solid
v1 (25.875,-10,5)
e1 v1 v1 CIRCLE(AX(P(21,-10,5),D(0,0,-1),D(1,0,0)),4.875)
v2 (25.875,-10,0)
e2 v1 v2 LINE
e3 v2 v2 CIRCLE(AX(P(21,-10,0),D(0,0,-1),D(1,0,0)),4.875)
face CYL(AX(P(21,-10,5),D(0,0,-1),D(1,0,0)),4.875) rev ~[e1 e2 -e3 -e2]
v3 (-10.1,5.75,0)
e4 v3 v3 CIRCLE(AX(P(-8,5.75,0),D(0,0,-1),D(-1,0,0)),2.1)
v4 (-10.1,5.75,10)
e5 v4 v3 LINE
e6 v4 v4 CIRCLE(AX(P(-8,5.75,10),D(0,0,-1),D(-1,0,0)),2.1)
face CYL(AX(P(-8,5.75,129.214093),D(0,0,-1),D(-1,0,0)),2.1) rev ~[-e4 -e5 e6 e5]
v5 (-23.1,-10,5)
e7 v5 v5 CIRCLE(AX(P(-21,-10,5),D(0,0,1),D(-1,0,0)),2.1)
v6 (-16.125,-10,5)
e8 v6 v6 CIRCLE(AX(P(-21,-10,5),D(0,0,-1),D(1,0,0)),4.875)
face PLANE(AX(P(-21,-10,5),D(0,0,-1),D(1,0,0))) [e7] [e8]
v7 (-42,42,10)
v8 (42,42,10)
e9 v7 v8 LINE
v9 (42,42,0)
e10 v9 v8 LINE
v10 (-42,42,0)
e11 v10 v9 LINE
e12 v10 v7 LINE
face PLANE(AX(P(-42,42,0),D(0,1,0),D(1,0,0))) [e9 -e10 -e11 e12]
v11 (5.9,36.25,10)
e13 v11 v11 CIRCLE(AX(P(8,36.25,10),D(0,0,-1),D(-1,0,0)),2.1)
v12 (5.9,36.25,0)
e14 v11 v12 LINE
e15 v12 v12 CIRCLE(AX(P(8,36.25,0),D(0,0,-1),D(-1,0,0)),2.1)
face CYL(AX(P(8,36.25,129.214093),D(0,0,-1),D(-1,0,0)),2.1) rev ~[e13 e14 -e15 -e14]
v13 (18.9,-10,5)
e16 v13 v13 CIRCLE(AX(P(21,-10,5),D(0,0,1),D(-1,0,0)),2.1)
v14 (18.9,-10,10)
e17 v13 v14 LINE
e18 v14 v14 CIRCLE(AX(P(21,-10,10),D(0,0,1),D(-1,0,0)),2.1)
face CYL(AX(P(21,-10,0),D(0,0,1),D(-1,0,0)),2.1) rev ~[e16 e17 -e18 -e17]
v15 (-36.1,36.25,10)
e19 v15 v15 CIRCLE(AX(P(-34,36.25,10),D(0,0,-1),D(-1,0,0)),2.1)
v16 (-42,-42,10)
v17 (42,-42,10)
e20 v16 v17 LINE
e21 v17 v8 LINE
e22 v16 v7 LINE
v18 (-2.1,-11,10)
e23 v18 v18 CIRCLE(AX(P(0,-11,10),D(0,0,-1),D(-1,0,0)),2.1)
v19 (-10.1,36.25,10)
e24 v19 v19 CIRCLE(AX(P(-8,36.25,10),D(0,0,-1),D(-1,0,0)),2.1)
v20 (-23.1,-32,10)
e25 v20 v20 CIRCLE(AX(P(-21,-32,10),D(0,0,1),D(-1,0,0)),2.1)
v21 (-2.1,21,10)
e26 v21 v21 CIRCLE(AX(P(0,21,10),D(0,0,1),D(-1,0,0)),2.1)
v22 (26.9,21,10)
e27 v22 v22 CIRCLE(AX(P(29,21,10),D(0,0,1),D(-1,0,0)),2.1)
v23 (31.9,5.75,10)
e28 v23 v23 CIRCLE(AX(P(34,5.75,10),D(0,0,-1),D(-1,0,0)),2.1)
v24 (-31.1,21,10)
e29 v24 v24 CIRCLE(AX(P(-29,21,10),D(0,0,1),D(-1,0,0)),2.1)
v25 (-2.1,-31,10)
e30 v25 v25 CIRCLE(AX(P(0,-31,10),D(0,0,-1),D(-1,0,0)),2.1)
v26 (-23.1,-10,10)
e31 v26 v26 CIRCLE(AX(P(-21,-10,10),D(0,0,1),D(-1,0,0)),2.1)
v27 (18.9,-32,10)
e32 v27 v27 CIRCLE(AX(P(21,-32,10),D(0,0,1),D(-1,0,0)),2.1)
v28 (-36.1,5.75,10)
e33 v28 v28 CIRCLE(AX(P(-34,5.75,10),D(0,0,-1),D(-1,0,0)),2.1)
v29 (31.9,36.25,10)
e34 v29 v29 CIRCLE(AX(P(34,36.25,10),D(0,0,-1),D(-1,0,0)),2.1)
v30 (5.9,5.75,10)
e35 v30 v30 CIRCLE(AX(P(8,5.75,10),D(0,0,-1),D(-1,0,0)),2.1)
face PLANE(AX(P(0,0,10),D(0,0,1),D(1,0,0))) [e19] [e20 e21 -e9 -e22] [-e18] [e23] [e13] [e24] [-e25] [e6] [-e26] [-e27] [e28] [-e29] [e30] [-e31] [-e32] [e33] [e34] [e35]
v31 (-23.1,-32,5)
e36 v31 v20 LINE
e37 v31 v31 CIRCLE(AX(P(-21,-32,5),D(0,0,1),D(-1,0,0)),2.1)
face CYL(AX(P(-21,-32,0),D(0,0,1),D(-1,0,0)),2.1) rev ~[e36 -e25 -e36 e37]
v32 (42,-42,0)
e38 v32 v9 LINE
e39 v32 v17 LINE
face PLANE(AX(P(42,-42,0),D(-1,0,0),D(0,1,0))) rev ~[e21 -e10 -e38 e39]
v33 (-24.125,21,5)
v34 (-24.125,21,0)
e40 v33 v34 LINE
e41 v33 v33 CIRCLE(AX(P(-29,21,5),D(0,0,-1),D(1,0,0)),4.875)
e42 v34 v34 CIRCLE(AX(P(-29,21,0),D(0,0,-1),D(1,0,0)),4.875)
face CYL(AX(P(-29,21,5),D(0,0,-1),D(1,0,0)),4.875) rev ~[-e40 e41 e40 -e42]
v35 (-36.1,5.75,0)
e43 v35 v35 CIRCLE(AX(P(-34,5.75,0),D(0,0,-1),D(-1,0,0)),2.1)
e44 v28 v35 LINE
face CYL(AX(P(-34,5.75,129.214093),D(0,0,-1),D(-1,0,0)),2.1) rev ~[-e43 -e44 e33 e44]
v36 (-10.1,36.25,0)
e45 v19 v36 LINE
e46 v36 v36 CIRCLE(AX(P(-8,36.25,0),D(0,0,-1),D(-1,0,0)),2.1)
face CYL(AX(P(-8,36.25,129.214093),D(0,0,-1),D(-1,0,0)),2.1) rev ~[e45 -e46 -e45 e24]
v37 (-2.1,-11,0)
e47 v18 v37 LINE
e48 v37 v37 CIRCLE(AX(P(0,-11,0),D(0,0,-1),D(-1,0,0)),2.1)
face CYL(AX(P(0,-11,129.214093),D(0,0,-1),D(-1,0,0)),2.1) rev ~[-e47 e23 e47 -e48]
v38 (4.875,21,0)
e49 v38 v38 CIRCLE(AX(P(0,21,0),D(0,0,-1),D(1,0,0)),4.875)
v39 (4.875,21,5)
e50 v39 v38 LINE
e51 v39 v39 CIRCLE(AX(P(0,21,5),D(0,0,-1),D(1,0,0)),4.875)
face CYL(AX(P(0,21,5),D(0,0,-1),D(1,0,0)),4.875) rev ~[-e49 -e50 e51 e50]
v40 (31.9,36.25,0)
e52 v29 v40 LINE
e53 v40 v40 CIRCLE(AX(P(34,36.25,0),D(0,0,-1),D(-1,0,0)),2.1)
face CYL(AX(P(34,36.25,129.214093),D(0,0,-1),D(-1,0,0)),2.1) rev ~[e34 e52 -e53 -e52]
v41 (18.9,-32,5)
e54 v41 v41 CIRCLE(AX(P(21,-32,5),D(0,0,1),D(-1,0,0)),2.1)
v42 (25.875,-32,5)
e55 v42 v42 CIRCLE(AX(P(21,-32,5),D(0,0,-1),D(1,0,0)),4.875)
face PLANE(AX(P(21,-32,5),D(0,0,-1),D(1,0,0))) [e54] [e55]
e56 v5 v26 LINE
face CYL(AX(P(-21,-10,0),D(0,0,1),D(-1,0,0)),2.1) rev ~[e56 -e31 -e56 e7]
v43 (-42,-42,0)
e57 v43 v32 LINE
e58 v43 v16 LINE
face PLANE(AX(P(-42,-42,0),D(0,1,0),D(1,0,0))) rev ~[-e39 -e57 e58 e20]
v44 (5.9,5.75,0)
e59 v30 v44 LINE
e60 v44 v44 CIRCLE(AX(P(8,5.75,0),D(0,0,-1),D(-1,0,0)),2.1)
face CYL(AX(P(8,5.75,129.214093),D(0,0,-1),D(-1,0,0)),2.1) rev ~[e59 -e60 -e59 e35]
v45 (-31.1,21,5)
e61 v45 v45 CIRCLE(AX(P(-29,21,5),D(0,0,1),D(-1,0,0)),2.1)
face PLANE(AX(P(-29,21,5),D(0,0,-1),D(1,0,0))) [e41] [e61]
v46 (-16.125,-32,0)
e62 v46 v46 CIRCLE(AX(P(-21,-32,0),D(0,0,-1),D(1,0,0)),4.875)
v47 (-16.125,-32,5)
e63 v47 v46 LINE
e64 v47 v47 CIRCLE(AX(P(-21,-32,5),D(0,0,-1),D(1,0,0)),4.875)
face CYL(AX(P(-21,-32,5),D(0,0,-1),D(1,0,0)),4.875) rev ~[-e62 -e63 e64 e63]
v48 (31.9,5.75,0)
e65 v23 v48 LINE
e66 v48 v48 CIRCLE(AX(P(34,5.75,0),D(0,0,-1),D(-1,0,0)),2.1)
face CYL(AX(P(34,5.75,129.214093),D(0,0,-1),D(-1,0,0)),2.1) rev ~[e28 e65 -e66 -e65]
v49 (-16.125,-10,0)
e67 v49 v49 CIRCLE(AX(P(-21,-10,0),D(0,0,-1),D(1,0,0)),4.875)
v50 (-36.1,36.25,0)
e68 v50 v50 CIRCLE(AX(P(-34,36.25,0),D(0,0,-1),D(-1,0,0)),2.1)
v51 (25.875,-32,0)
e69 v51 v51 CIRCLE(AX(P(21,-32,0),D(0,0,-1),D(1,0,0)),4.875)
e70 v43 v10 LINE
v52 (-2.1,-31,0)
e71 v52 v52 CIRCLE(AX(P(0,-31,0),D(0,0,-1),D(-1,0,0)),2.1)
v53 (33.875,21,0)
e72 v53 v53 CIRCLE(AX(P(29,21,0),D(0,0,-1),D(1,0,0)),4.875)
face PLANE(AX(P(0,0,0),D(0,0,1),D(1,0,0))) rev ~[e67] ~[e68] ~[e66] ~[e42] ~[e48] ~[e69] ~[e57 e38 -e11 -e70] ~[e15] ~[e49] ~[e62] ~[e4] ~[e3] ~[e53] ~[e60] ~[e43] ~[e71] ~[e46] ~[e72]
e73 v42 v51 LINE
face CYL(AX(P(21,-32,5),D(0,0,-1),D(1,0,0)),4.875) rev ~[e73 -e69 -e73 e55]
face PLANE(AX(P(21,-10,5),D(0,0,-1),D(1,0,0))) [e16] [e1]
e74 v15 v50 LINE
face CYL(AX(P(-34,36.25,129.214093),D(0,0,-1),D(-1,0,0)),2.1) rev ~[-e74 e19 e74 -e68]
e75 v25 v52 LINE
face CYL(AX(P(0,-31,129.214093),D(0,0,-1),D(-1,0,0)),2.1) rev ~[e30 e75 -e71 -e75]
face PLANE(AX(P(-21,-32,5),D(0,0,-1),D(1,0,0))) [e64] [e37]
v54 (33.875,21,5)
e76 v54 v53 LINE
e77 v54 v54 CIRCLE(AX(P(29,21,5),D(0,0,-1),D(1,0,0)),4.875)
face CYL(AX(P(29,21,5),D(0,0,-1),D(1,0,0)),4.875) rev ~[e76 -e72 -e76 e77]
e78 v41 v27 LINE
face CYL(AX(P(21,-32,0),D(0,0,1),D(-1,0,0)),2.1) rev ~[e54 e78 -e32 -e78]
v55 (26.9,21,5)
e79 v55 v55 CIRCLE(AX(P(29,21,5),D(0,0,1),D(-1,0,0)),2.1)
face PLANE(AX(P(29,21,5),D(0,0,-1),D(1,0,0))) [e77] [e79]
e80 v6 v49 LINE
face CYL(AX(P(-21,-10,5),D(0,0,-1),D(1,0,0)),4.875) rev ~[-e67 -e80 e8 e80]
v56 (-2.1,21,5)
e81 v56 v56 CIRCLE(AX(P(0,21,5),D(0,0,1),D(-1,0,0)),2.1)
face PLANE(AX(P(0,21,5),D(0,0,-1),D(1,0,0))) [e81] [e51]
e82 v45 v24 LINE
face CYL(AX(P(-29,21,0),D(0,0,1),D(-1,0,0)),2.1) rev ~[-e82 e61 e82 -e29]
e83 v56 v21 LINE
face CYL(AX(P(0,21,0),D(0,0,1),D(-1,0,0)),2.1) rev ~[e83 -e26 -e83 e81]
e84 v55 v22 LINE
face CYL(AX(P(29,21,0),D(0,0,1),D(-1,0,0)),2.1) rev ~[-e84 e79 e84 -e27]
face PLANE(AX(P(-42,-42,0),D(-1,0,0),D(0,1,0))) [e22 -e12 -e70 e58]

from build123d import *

# Parameters (mm, degrees)
F0_W           = 84
F0_H           = 84
F1_DEPTH       = 10
F3_D           = 4.2
F5_D           = 4.2
F5_CBORE_D     = 9.75
F5_CBORE_DEPTH = 5


# Not quite as in the source:
# - a feature names something its author has since deleted; it is built from what else it names


with BuildPart() as f1:
    # F0 (on Top) → F1 (new body)
    with BuildSketch(Plane.XY):
        Rectangle(F0_W, F0_H)
    extrude(amount=F1_DEPTH)

    # F3 (through all)
    with Locations(Plane.XY.offset(10)):
        with Locations((-34, 36.25), (-8, 36.25), (8, 36.25), (34, 36.25), (34, 5.75), (8, 5.75), (-8, 5.75), (-34, 5.75), (0, -11), (0, -31)):
            Hole(F3_D / 2)

    # F5 (through all)
    with Locations(Plane(origin=(0, 0, 0), x_dir=(1, 0, 0), z_dir=(0, 0, -1))):
        with Locations((29, -21), (0, -21), (-29, -21), (21, 10), (21, 32), (-21, 32), (-21, 10)):
            CounterBoreHole(F5_D / 2, F5_CBORE_D / 2, F5_CBORE_DEPTH)


solid = f1.part
